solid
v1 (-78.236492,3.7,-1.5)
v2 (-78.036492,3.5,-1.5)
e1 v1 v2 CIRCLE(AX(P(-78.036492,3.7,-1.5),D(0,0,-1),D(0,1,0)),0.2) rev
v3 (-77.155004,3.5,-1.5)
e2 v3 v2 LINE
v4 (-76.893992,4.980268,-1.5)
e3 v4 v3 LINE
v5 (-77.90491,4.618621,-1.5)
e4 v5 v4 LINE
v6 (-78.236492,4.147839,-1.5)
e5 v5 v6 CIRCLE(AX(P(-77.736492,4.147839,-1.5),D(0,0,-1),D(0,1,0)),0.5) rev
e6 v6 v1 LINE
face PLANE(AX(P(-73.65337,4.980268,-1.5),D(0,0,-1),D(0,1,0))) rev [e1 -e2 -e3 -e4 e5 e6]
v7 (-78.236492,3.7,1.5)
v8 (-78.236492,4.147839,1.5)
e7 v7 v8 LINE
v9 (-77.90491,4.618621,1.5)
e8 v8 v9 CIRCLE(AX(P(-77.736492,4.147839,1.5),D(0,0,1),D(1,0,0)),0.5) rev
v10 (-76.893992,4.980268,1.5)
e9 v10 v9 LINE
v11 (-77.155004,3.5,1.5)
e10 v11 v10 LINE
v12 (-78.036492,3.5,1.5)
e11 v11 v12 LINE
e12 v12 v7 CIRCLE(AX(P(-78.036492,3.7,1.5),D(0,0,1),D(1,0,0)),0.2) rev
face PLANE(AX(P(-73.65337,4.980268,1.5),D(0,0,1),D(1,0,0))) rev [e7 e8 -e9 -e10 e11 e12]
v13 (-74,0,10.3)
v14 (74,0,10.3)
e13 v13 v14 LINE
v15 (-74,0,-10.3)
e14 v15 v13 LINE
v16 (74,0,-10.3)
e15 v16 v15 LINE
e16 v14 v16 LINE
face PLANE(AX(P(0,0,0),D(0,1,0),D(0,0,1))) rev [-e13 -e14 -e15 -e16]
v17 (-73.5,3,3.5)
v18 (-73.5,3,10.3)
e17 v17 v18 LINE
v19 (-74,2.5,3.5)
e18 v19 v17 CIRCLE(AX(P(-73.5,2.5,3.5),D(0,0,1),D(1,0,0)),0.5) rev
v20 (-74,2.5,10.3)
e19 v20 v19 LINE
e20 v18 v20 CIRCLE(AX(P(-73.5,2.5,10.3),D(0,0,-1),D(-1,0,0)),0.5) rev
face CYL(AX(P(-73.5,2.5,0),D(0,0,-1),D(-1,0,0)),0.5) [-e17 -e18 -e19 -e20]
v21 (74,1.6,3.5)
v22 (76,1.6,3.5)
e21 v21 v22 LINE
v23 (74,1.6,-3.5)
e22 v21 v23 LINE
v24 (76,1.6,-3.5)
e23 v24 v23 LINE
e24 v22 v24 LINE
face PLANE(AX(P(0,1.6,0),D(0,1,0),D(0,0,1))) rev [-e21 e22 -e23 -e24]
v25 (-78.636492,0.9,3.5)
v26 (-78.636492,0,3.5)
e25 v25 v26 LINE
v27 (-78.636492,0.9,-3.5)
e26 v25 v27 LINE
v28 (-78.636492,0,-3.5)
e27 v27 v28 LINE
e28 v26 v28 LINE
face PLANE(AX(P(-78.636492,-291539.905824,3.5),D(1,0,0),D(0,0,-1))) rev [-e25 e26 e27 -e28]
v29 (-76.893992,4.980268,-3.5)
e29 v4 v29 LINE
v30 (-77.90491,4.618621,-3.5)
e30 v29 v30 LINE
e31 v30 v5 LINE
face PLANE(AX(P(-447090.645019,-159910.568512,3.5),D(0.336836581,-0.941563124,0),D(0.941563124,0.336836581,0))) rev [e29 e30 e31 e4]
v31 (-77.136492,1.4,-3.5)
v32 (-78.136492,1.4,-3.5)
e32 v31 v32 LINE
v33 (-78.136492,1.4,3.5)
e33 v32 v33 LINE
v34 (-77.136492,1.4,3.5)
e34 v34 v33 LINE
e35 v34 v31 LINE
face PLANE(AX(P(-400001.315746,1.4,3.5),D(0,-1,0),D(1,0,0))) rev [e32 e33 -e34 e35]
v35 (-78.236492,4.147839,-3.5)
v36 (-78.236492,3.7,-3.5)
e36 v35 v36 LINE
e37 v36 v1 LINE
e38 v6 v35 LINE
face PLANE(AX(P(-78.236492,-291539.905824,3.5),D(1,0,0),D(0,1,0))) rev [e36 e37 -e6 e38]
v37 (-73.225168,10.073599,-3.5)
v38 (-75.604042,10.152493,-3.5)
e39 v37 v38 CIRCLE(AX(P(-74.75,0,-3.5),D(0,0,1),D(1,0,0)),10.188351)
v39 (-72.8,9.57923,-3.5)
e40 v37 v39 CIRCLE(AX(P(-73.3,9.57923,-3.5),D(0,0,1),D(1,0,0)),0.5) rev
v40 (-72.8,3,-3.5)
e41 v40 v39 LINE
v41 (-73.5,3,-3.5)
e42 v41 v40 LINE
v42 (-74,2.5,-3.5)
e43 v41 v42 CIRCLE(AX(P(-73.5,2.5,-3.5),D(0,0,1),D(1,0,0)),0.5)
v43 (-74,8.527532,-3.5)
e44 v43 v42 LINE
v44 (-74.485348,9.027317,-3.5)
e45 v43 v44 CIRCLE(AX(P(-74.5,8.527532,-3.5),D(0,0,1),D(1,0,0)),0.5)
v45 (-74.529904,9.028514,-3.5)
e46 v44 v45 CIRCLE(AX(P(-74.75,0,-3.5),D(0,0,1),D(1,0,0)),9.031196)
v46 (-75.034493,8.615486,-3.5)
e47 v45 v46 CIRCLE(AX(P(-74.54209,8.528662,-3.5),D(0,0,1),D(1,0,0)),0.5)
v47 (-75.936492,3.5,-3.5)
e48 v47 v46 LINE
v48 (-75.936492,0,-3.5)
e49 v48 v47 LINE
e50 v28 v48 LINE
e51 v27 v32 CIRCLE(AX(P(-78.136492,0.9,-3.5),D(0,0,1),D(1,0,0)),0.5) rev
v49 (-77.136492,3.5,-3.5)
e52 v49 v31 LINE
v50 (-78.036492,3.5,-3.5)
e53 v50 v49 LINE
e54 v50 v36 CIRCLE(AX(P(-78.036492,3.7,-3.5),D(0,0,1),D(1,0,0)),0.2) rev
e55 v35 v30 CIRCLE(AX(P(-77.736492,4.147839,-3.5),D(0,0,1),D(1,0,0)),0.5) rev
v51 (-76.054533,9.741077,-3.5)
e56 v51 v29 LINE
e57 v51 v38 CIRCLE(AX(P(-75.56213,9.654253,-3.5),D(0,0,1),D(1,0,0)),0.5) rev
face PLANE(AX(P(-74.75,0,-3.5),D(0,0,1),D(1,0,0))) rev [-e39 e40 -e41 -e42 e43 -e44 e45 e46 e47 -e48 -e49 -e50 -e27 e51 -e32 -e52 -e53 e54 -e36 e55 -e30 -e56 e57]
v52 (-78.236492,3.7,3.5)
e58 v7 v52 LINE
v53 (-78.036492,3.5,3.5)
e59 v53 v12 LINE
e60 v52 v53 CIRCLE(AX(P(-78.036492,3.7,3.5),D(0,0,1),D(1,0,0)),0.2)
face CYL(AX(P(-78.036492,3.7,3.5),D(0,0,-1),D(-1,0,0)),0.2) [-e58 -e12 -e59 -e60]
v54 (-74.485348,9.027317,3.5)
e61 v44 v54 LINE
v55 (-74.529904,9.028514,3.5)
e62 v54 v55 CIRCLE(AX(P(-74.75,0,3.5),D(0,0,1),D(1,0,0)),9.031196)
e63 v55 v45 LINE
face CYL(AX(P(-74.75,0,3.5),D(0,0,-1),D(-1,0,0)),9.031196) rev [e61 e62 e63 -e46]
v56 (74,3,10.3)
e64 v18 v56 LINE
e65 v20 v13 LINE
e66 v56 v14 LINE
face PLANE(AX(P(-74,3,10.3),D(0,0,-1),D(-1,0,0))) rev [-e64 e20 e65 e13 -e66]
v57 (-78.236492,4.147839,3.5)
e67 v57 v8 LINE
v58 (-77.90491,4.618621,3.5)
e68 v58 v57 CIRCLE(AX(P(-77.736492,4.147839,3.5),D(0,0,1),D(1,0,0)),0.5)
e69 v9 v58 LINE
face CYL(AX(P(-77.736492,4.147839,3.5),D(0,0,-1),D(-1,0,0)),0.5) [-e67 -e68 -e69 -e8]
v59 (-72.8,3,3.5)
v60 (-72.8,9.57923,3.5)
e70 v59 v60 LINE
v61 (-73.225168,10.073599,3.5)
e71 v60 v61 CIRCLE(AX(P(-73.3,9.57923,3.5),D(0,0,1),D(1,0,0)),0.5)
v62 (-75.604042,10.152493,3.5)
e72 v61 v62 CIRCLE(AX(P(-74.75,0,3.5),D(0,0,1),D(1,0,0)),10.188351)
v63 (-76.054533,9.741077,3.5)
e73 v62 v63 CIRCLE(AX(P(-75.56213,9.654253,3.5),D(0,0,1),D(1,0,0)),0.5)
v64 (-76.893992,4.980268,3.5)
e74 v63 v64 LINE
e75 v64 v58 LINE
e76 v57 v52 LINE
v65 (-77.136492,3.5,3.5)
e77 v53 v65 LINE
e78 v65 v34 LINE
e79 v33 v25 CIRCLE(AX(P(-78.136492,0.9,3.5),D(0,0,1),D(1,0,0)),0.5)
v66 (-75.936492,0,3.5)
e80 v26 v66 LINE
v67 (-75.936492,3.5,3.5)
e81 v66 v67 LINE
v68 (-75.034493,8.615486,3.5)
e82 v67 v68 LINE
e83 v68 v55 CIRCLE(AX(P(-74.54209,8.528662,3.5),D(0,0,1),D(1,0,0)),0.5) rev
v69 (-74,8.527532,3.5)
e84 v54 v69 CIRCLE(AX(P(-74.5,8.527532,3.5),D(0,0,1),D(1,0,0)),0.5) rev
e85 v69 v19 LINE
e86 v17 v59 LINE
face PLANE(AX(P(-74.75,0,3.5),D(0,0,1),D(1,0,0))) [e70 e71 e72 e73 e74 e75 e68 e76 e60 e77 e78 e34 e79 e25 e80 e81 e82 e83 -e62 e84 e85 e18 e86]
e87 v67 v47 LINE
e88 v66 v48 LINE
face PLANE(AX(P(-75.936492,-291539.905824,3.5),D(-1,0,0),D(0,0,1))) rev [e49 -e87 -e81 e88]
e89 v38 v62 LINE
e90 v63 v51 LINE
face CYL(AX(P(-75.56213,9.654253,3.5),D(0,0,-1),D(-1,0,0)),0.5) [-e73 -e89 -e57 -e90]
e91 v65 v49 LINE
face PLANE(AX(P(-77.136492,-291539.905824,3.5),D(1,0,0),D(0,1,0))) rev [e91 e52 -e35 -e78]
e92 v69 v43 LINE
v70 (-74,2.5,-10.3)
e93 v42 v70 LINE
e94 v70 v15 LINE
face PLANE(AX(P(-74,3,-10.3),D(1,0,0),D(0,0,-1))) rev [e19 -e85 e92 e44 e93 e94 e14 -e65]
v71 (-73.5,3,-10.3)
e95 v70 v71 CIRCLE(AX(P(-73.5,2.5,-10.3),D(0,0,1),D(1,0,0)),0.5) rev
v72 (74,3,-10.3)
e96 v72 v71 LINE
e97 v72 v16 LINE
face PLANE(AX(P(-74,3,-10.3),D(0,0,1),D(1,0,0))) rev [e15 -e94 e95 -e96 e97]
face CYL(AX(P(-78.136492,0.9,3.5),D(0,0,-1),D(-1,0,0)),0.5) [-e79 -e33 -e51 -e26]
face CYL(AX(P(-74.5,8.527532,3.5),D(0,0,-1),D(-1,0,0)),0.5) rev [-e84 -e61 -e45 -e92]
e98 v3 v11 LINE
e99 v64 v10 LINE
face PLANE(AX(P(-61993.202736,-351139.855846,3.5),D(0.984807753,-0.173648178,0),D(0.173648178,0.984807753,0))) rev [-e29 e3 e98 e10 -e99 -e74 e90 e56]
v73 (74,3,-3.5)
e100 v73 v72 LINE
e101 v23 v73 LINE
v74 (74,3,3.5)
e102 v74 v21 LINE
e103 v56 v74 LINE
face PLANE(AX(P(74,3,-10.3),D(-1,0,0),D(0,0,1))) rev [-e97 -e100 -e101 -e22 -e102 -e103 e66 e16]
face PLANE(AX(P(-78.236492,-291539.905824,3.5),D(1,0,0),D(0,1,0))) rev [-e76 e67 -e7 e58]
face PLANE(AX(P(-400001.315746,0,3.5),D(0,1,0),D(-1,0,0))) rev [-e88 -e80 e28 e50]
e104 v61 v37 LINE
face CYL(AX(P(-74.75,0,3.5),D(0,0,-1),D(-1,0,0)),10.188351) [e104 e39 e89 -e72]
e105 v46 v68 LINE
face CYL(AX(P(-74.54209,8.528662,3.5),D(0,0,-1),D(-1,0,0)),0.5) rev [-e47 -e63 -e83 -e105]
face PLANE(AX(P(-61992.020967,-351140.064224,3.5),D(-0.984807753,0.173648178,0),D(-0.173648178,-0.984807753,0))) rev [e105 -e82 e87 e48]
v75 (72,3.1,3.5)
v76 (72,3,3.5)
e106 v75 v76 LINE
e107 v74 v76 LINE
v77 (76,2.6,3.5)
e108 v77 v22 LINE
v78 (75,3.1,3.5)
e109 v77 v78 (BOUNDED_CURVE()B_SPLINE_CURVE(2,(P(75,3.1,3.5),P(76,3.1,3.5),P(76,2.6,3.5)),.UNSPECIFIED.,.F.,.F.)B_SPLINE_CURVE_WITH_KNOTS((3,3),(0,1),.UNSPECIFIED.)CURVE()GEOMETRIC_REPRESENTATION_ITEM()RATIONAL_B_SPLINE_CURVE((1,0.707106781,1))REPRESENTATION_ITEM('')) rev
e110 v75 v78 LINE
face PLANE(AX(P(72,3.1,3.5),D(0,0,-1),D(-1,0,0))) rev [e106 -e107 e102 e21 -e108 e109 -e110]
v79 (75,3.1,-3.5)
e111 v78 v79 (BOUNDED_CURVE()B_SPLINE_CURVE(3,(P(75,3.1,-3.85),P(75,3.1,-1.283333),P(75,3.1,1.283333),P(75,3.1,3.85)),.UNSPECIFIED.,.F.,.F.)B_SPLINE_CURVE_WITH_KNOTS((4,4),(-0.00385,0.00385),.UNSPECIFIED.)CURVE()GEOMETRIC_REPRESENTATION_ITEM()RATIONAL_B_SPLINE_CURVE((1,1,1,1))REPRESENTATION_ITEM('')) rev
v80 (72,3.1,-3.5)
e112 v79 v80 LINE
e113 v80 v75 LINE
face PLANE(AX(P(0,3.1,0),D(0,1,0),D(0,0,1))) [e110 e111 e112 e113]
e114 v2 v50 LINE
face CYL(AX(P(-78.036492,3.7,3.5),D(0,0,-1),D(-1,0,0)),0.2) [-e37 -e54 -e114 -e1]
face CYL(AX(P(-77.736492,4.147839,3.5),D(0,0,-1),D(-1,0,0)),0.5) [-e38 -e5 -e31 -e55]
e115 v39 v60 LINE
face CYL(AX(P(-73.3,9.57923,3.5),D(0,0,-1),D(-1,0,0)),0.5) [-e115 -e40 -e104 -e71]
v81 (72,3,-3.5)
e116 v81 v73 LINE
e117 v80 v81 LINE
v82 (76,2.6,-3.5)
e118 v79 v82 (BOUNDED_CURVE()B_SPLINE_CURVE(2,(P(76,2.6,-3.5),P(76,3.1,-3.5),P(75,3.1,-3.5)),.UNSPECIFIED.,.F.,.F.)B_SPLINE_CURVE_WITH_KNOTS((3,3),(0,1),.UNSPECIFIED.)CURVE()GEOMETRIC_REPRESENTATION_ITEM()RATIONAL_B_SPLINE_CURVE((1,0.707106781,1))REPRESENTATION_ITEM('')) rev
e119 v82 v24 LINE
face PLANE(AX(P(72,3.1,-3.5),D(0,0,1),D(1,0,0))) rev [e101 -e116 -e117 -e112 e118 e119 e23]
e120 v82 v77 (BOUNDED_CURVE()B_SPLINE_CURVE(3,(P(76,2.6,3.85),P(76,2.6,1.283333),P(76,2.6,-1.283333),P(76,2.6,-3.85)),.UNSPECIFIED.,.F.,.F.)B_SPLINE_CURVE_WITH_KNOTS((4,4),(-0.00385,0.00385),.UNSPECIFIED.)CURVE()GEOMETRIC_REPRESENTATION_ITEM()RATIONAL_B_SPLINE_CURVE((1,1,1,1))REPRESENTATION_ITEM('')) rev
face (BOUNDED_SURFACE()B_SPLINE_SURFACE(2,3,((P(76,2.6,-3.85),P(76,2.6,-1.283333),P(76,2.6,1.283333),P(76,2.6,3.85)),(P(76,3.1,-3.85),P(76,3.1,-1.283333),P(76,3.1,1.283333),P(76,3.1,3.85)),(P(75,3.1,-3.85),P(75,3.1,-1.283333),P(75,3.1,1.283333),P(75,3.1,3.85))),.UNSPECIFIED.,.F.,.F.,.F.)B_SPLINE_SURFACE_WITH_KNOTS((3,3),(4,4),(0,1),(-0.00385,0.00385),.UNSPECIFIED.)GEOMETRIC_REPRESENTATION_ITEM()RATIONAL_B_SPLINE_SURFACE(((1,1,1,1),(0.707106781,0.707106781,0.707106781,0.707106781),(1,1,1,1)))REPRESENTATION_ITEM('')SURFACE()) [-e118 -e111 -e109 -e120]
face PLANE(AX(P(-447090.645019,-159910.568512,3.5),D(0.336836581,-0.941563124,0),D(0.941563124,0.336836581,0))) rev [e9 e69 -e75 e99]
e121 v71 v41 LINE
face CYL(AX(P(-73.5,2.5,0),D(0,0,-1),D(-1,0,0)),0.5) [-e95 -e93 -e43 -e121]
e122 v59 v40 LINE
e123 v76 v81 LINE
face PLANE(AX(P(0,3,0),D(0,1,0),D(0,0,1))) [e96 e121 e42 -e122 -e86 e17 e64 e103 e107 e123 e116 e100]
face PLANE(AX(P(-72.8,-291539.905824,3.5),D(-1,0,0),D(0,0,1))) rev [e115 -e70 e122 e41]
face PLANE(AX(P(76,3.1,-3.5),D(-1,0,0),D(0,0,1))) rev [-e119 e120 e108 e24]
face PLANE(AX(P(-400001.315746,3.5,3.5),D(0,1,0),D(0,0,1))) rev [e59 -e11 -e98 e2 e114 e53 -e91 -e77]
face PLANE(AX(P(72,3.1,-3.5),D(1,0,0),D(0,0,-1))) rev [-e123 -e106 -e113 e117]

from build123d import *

# Parameters (mm, degrees)
SKETCH_1_W          = 148
SKETCH_1_H          = 20.6
EXTRUDE_1_DEPTH     = 3
EXTRUDE_START       = -1.4
SKETCH_2_W          = 4
SKETCH_2_H          = 7
EXTRUDE_2_DEPTH     = 1.5
EXTRUDE_START_2     = -10.3
EXTRUDE_4_DEPTH     = 3.5
FILLET_2_SIZE       = 1
FILLET_2_SIZE_2     = 0.5
CUT_EXTRUDE_1_REACH = 156.915
SKETCH_6_W          = 3
SKETCH_6_H          = 1.48026825
FILLET_3_R          = 0.5
FILLET_4_R          = 0.2


with BuildPart() as part:
    # 草图1 → 凸台-拉伸1 (new body)
    with BuildSketch(Plane(origin=(0, 0, 0), x_dir=(1, 0, 0), z_dir=(0, 1, 0))):
        Rectangle(SKETCH_1_W, SKETCH_1_H)
    extrude(amount=EXTRUDE_1_DEPTH)

    # 草图2 → 凸台-拉伸2 (add)
    with BuildSketch(Plane(origin=(0, 3, 0), x_dir=(1, 0, 0), z_dir=(0, 1, 0)).offset(EXTRUDE_START)):
        with Locations((74, 0)):
            Rectangle(SKETCH_2_W, SKETCH_2_H)
    extrude(amount=EXTRUDE_2_DEPTH)

    # 草图5 → 凸台-拉伸4 (add, symmetric)
    with BuildSketch(Plane.XY.offset(10.3).offset(EXTRUDE_START_2)):
        with BuildLine():
            Line((-74, 3), (-74, 9))
            ThreePointArc((-74, 9), (-74.480432289, 9.027171941), (-74.961629872, 9.02871601))
            Line((-74.961629872, 9.02871601), (-75.936491673, 3.5))
            Line((-75.936491673, 3.5), (-75.936491673, 0))
            Line((-75.936491673, 0), (-77.2, 0))
            Line((-77.2, 0), (-78.636491673, 0))
            Line((-78.636491673, 0), (-78.636491673, 1.4))
            Line((-78.636491673, 1.4), (-77.136491673, 1.4))
            Line((-77.136491673, 1.4), (-77.136491673, 3.5))
            Line((-77.136491673, 3.5), (-78.236491673, 3.5))
            Line((-78.236491673, 3.5), (-78.236491673, 4.5))
            Line((-78.236491673, 4.5), (-76.893992376, 4.98026825))
            Line((-76.893992376, 4.98026825), (-75.98900028, 10.112733474))
            ThreePointArc((-75.98900028, 10.112733474), (-74.390059228, 10.181991094), (-72.8, 10))
            Line((-72.8, 10), (-72.8, 3))
            Line((-72.8, 3), (-74, 3))
        make_face()
    extrude(amount=EXTRUDE_4_DEPTH, both=True)

    # 圆角2
    # an asymmetric fillet: 1, 0.5 mm, written as the material it takes off along each edge
    with BuildSketch(Plane(origin=(76, 3.1, -6), x_dir=(-1, 0, 0), z_dir=(0, 0, 1))) as fillet_2_piece_1:
        with BuildLine():
            Bezier((FILLET_2_SIZE, 0), (0, 0), (0, FILLET_2_SIZE_2), weights=[1, 0.707106781, 1])
            Line((0, FILLET_2_SIZE_2), (0, 0))
            Line((0, 0), (FILLET_2_SIZE, 0))
        make_face()
    extrude(amount=12, mode=Mode.SUBTRACT)

    # 切除-拉伸1: up to this plane
    cut_extrude_1_end = Plane(origin=(-61993.202735843, -351139.85584642, 3.5), z_dir=(0.984807753012209, -0.17364817766692522, 0))
    # 草图6 → 切除-拉伸1 (cut, up to the surface)
    with BuildSketch(Plane.ZY.offset(78.236491673), mode=Mode.PRIVATE) as cut_extrude_1_sk1:
        with Locations((0, 4.240134125)):
            Rectangle(SKETCH_6_W, SKETCH_6_H)
    cut_extrude_1_tool1 = split(extrude(cut_extrude_1_sk1.sketch, amount=-CUT_EXTRUDE_1_REACH, mode=Mode.PRIVATE), bisect_by=cut_extrude_1_end, keep=Keep.BOTH, mode=Mode.PRIVATE)
    add(cut_extrude_1_tool1.solids().sort_by_distance((-78.236492, 4.240134, 0))[0], mode=Mode.SUBTRACT)

    # 圆角3
    fillet_3_edges = [part.edges().sort_by_distance(p)[0] for p in [
        (-74, 3, -6.9),
        (-74, 3, 6.9),
        (-74.961629872, 9.02871601, 0),
        (-74, 9, 0),
        (-72.8, 10, 0),
        (-75.98900028, 10.112733474, 0),
        (-78.236491673, 4.5, 2.5),
        (-78.636491673, 1.4, 0),
        (-78.236491673, 4.5, -2.5),
    ]]
    fillet(fillet_3_edges, radius=FILLET_3_R)

    # 圆角4
    fillet_4_edges = [part.edges().sort_by_distance(p)[0] for p in [
        (-78.236491673, 3.5, 2.5),
        (-78.236491673, 3.5, -2.5),
    ]]
    fillet(fillet_4_edges, radius=FILLET_4_R)


solid = part.part
